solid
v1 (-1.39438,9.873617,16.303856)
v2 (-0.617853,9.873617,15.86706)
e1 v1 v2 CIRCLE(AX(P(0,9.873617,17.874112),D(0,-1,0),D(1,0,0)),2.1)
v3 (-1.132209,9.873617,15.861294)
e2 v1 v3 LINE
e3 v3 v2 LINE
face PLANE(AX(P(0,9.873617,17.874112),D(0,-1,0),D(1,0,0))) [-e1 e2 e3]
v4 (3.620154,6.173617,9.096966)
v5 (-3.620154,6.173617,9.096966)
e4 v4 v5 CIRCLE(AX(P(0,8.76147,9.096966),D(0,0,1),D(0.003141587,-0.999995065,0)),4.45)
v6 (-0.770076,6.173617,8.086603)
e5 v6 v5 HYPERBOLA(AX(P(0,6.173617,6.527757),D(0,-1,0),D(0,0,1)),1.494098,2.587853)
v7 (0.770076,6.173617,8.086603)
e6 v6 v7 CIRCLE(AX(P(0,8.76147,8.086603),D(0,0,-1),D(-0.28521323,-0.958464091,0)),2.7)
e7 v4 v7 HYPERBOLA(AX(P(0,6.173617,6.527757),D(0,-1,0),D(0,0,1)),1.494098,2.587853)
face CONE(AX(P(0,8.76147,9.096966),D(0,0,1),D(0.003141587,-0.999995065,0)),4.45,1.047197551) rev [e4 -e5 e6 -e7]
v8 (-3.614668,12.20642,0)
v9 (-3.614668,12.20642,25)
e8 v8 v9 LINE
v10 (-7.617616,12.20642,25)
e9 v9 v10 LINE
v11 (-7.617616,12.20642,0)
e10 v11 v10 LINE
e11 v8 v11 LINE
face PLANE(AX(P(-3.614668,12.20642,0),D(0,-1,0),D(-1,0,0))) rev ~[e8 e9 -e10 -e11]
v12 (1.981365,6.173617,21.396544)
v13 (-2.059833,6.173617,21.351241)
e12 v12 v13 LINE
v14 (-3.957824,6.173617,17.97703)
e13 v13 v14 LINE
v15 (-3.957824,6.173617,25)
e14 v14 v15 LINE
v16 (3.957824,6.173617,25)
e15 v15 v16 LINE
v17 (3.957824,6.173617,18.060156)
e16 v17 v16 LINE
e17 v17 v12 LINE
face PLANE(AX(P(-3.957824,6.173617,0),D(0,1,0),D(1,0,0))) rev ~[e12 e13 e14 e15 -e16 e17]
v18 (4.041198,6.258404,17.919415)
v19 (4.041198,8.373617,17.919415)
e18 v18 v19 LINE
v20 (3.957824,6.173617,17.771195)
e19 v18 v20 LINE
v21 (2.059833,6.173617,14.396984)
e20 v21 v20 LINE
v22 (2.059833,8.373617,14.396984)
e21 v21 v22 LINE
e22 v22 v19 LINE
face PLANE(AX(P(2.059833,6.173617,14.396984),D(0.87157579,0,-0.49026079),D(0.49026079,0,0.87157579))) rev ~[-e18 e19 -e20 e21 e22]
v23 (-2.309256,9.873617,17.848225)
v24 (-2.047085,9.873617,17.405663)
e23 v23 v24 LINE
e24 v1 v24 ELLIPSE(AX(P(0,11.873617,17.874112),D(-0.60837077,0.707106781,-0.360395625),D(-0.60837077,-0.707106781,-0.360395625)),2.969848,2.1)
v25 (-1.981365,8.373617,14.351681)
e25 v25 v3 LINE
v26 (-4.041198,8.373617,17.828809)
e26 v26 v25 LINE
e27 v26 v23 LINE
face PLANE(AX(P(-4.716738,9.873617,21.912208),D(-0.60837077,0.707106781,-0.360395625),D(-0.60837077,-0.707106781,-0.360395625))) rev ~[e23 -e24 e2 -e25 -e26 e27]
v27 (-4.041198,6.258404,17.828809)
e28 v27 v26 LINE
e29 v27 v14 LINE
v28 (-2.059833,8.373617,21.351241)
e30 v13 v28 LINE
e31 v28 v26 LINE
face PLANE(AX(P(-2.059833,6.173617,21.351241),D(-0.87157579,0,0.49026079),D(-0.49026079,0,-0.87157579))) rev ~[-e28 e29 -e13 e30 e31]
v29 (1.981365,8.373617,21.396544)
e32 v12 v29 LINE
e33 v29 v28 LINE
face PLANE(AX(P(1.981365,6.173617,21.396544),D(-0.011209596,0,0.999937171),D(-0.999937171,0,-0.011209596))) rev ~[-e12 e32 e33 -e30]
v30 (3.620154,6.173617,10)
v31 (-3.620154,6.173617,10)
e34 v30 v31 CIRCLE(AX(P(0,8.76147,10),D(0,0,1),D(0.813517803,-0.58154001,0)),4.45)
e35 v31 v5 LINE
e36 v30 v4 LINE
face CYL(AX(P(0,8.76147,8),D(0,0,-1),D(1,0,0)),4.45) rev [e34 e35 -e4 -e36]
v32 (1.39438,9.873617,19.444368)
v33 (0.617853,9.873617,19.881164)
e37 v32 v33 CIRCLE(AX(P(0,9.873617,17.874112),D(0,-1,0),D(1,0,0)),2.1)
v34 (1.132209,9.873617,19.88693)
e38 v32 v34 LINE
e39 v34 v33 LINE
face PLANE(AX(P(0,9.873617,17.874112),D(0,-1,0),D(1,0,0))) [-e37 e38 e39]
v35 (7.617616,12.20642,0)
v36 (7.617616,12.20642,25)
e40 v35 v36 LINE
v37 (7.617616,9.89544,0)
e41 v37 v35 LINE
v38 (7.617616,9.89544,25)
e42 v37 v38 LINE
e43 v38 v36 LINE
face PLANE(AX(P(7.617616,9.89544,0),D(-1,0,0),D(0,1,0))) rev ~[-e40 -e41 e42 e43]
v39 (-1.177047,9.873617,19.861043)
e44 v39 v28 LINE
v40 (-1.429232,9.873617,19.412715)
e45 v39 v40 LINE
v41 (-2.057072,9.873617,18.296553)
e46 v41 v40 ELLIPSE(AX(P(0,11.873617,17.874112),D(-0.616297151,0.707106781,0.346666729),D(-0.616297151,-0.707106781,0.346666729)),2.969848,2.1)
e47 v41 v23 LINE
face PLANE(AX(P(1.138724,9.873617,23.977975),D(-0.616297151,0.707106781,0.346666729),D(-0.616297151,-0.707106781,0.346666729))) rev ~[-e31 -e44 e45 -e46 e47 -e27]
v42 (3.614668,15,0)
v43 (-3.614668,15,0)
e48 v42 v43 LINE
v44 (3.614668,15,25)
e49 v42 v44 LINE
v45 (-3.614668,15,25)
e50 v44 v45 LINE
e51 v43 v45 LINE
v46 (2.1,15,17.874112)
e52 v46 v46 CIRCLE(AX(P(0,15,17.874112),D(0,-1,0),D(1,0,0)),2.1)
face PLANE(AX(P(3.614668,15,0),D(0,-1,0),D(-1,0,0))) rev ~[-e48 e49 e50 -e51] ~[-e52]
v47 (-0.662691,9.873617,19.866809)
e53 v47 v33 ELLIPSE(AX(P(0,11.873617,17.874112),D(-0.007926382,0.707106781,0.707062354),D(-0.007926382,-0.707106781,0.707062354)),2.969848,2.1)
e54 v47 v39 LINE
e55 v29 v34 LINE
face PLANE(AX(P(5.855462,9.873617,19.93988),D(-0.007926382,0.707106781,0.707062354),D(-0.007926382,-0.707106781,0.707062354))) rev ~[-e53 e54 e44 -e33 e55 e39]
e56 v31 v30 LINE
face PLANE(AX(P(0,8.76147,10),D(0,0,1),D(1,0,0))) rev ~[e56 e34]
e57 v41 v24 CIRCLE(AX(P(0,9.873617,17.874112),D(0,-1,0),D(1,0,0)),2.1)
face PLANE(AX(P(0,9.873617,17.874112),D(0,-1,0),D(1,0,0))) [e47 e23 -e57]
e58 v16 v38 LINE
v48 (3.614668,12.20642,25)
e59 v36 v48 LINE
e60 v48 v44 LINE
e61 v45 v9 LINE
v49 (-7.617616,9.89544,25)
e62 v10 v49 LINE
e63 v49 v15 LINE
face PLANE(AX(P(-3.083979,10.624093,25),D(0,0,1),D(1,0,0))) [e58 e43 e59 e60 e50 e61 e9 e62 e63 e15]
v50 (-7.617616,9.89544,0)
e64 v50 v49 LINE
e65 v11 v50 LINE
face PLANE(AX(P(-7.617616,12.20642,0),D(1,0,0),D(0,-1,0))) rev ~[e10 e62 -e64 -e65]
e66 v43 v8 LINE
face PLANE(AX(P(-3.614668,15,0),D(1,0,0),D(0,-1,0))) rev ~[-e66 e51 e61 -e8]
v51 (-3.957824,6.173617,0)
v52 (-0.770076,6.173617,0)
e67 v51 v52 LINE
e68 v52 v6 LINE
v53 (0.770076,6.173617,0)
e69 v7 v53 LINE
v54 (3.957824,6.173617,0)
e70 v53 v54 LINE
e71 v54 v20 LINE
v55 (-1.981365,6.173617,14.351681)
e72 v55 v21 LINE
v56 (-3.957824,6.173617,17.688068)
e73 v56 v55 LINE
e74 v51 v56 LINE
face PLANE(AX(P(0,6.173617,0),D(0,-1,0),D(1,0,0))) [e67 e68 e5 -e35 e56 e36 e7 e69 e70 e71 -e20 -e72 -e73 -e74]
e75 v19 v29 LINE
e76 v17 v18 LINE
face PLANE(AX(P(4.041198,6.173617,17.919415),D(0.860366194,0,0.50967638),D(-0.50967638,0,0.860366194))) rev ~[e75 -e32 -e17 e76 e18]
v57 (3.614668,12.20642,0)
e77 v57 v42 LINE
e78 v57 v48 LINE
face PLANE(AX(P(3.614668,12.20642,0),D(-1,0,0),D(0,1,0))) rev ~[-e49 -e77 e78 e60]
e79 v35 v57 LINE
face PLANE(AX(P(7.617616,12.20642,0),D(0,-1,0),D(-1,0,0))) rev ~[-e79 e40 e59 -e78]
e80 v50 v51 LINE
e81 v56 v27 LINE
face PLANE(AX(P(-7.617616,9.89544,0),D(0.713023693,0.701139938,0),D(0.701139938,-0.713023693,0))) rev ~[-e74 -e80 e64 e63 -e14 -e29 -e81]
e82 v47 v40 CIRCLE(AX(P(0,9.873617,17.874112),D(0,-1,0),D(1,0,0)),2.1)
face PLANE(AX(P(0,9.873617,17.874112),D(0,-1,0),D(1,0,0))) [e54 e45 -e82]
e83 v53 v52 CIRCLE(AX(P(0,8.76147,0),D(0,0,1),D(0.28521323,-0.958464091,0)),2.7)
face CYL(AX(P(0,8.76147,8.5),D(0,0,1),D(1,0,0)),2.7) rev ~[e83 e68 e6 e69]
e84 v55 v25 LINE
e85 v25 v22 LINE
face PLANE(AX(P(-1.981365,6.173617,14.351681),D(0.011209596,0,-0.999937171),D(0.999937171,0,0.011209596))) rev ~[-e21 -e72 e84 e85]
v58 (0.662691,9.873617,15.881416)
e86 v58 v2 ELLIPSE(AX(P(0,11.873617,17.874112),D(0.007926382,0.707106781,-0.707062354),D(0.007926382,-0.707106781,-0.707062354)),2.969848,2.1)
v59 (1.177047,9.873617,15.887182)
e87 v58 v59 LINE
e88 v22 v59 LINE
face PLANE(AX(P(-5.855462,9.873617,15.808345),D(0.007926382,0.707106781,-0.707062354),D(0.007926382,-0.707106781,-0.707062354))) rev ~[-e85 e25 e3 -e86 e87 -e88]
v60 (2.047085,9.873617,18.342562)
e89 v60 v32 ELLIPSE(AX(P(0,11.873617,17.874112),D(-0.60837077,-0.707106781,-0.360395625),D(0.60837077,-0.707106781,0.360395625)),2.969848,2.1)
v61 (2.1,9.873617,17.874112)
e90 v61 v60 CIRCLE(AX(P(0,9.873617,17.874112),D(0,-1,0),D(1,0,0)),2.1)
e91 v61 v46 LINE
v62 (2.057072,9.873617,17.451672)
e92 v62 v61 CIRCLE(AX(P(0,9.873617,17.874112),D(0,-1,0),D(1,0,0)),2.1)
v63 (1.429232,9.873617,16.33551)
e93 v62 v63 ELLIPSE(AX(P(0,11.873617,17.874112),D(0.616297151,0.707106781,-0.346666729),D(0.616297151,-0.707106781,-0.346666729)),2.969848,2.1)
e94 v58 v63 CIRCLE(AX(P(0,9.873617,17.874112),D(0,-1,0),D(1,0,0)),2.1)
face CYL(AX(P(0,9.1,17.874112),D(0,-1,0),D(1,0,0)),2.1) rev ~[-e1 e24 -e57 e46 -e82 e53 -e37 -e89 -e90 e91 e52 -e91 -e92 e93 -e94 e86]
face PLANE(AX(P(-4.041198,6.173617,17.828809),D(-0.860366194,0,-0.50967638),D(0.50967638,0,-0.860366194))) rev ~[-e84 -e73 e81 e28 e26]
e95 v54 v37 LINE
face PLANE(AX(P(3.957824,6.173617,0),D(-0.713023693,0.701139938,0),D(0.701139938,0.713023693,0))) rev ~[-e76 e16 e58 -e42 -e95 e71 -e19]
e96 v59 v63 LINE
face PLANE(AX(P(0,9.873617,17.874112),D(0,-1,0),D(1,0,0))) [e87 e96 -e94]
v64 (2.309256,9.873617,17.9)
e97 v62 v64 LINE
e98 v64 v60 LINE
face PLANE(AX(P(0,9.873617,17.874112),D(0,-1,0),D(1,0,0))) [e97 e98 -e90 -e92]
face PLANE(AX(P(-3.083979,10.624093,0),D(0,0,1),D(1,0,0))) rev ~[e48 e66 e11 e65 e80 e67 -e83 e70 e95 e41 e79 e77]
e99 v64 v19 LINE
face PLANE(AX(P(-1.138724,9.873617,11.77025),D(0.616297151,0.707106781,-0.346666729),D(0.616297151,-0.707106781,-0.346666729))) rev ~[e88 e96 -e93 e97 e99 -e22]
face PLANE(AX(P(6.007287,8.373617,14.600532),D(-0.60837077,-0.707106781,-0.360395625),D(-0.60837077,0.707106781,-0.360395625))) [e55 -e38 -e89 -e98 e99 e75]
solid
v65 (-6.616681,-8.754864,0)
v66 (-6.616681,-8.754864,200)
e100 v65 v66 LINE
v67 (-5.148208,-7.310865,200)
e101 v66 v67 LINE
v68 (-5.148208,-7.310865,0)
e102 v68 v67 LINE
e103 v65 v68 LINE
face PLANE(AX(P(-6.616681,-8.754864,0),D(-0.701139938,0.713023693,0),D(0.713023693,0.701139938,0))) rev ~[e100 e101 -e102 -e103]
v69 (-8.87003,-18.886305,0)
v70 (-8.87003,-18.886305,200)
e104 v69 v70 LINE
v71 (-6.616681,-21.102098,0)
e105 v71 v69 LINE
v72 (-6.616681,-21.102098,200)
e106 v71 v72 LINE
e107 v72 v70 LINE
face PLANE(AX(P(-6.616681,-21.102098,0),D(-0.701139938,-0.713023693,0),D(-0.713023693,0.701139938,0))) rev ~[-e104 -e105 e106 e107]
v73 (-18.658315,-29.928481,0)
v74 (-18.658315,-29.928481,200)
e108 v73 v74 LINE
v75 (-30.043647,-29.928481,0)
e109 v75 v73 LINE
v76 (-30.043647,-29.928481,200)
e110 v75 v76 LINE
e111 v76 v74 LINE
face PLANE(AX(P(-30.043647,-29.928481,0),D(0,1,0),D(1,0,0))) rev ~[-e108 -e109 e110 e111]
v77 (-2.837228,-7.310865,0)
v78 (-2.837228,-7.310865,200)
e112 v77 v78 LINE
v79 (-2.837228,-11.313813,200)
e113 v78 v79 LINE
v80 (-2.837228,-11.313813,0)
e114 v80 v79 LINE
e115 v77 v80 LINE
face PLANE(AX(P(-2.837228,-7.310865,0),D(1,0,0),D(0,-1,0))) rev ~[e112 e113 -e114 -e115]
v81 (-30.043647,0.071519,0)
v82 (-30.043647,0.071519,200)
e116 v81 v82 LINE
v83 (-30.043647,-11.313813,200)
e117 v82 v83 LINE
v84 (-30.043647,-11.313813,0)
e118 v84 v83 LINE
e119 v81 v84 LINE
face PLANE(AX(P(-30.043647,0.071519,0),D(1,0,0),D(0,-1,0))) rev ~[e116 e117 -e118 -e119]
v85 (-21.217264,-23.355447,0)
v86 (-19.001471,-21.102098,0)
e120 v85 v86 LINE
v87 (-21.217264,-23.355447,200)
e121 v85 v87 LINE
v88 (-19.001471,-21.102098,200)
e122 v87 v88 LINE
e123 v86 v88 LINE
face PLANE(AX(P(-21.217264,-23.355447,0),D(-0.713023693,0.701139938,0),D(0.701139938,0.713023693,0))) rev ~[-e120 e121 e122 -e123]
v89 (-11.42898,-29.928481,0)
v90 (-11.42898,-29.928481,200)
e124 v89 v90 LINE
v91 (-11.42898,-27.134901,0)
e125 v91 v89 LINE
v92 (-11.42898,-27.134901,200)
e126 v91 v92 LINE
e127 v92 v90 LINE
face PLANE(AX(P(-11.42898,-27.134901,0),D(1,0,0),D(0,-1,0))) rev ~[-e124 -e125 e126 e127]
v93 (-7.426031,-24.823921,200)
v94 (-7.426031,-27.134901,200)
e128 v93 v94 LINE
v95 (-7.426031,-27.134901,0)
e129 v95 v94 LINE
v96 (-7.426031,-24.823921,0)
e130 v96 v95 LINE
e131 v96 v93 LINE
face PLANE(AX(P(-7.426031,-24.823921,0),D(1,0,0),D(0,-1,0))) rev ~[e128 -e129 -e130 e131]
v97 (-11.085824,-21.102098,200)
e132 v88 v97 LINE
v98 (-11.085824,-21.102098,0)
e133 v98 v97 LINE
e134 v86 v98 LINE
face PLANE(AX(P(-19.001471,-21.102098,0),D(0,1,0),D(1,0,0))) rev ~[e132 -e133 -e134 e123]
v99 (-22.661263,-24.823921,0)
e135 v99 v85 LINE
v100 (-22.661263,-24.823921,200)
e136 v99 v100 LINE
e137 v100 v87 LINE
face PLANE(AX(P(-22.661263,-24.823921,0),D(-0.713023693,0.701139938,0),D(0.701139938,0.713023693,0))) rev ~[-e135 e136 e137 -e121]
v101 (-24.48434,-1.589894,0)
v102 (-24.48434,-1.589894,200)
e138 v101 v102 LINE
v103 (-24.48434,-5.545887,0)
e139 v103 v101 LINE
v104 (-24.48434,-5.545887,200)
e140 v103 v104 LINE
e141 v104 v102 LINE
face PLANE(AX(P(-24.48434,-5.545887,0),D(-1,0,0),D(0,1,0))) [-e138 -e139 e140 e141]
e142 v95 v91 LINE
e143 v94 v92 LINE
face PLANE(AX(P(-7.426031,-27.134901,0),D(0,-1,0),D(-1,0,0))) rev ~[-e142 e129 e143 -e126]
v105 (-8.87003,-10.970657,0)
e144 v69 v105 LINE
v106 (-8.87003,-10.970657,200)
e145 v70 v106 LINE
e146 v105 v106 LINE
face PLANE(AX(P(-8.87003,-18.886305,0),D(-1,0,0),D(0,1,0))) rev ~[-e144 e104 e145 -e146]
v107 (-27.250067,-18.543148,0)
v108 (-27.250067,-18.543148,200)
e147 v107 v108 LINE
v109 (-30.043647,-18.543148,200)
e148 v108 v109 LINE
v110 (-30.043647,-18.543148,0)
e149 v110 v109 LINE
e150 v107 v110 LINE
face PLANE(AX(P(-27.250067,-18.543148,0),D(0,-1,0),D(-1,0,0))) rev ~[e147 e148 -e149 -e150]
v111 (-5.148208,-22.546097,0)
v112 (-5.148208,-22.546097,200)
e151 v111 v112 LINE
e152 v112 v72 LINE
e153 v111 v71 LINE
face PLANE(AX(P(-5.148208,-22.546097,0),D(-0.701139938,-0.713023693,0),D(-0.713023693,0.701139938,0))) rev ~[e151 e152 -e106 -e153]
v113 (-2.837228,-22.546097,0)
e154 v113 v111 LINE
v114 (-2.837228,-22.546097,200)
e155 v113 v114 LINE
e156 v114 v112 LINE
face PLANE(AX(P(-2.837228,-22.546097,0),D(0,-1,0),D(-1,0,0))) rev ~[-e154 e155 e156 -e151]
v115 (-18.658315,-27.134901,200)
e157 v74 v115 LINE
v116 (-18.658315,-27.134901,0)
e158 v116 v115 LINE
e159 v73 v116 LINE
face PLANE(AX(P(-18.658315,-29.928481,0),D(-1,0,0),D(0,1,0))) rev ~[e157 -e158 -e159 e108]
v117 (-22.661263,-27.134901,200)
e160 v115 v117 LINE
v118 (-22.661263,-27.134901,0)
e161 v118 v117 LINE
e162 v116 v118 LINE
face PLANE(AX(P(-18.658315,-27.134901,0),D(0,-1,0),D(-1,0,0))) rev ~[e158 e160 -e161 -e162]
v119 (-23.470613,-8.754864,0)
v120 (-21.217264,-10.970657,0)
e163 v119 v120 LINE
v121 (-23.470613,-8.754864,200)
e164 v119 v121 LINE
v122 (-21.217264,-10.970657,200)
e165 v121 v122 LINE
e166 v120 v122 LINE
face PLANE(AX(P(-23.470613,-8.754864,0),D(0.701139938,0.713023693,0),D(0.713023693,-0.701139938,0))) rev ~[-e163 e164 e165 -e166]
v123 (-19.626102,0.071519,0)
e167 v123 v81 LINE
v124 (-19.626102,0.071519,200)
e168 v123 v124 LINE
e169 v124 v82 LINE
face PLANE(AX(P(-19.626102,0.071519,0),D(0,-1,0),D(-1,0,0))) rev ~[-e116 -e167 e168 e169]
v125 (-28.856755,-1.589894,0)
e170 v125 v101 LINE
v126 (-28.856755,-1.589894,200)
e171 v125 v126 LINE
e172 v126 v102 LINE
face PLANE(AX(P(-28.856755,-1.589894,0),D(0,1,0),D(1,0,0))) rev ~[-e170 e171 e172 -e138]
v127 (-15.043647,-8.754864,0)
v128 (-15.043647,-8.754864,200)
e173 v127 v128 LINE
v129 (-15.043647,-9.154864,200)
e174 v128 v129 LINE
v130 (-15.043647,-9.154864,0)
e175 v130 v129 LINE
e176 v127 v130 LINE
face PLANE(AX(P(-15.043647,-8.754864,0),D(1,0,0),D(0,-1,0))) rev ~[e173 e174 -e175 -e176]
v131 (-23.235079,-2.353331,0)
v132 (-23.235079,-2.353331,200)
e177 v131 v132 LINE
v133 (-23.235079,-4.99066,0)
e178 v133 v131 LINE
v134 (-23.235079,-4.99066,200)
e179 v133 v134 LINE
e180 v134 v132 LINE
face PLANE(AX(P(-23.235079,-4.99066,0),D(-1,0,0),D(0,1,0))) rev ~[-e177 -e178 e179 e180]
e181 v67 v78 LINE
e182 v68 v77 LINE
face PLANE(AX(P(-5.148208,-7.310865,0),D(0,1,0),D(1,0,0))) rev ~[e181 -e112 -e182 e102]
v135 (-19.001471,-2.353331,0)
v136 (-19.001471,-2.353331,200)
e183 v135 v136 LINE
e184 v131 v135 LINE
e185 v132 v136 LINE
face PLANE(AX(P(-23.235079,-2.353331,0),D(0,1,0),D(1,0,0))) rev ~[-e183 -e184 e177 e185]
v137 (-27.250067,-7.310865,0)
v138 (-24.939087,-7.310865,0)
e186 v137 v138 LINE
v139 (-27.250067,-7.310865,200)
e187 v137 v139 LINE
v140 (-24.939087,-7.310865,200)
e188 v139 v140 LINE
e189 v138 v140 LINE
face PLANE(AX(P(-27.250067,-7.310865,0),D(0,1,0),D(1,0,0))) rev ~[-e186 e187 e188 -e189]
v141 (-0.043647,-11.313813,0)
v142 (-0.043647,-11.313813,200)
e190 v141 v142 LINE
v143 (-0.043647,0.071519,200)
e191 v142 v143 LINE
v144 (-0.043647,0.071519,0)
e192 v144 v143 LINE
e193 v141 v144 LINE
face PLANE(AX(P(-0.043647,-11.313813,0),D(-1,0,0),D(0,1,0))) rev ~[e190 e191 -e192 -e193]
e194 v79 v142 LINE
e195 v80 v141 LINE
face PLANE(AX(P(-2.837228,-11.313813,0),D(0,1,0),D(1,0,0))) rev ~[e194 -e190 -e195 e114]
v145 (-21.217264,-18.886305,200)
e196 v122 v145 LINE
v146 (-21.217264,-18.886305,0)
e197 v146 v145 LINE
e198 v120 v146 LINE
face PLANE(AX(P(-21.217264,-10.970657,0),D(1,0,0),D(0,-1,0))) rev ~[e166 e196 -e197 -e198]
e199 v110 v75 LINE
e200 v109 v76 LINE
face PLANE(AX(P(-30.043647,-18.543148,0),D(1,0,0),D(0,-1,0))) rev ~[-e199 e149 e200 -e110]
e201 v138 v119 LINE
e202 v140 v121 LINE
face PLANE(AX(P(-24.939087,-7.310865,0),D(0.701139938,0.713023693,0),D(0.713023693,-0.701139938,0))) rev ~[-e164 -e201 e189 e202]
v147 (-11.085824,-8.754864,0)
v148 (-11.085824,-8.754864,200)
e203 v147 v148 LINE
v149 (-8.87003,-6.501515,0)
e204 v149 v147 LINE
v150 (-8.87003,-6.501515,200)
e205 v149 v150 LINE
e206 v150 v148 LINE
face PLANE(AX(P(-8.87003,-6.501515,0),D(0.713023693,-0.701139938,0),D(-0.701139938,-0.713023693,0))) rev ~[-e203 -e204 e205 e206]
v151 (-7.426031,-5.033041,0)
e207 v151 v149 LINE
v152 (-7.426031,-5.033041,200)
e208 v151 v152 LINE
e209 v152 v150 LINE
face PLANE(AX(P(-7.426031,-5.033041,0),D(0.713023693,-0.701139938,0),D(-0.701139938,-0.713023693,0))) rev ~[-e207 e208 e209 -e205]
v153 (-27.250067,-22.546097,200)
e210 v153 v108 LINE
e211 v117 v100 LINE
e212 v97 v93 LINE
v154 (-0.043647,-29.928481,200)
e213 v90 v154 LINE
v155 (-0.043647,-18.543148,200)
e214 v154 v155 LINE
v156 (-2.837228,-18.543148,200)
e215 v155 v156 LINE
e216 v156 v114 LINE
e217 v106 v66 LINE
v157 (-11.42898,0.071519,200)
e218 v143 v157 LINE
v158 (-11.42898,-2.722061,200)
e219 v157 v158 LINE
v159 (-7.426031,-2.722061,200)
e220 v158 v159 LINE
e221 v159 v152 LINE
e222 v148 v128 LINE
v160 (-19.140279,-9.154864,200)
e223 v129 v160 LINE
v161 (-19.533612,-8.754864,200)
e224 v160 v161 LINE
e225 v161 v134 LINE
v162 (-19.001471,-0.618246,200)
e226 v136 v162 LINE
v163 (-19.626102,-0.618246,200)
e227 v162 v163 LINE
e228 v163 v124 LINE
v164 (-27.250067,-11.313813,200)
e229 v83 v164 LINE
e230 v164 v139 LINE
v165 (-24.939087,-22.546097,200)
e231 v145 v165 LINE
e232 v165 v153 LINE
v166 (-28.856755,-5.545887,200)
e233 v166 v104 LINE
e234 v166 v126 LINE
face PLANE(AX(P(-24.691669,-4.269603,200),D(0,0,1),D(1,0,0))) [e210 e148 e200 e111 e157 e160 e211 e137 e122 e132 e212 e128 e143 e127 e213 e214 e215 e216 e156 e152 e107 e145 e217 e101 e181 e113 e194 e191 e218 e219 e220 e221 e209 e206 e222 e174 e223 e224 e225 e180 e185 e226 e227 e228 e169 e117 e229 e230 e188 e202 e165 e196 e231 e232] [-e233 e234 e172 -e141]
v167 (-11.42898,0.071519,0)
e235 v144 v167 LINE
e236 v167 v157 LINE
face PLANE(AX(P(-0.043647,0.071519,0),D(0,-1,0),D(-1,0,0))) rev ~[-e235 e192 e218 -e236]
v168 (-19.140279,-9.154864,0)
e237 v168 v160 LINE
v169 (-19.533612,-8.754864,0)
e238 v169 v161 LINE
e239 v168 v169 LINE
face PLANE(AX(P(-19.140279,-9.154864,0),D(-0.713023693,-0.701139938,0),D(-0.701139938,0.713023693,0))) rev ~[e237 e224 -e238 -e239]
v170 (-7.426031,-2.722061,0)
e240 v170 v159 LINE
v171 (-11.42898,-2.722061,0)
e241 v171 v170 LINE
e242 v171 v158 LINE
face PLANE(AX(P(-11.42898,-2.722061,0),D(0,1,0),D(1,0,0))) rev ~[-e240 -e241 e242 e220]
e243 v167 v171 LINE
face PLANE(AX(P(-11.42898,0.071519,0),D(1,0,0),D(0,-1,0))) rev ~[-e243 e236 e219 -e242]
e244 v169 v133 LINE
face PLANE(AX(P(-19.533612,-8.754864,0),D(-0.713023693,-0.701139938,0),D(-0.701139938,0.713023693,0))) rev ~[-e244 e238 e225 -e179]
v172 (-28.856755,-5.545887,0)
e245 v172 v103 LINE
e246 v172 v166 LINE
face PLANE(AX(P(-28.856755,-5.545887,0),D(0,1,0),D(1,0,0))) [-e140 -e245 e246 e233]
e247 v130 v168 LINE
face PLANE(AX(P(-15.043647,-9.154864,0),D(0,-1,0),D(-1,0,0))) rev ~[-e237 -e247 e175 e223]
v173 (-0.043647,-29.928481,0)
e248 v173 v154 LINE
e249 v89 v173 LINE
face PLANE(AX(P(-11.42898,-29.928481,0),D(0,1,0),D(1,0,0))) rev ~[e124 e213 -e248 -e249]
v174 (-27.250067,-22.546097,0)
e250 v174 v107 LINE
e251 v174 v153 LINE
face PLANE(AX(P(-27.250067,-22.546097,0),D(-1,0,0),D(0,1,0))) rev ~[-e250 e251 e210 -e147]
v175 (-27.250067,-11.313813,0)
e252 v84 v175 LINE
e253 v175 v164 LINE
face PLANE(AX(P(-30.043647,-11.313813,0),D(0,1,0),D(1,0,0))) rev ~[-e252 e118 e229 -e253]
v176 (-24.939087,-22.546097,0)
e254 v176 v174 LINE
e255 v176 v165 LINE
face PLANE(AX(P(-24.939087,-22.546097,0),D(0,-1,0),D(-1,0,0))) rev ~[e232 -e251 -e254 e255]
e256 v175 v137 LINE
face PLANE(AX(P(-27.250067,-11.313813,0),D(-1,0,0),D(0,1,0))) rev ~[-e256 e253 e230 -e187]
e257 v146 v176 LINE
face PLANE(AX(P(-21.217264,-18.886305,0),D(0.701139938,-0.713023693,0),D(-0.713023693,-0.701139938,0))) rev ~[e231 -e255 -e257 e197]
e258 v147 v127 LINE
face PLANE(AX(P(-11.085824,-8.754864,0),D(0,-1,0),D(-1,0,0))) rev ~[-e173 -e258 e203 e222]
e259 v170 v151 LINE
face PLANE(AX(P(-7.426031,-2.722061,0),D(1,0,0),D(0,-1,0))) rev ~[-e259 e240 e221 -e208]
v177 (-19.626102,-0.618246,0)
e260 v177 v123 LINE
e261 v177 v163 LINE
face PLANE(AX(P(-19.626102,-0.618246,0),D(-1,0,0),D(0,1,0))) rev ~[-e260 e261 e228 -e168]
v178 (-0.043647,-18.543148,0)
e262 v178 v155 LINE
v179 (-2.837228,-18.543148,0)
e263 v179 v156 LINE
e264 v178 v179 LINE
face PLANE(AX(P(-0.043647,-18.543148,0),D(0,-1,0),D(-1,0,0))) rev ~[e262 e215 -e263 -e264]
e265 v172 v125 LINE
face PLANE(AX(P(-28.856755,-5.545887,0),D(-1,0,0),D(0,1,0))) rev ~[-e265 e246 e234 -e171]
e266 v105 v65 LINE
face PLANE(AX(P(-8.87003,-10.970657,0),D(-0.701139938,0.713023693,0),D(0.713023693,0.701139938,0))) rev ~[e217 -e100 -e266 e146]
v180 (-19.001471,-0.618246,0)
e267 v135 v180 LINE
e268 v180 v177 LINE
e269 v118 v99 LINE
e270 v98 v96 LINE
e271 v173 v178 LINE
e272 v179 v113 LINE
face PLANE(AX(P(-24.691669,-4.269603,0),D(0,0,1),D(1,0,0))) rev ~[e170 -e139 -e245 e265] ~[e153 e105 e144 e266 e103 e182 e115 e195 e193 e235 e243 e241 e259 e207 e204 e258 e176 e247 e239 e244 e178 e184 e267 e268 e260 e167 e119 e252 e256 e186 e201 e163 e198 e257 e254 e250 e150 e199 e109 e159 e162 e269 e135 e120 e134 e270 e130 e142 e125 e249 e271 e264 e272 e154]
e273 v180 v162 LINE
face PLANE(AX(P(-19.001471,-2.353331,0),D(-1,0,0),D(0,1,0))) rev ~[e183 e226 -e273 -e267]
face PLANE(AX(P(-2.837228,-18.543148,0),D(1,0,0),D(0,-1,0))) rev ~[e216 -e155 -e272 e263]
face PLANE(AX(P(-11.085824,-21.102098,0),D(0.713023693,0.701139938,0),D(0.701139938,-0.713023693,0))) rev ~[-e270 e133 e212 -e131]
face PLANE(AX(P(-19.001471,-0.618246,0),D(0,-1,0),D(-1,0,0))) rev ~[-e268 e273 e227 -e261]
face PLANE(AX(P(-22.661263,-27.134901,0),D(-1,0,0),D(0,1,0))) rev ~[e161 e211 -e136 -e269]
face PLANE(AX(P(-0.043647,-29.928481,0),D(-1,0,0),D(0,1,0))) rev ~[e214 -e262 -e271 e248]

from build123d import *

# Parameters (mm, degrees)
F1_DEPTH     = 25
F2_R         = 2.7
F3_DEPTH     = 10
F4_R         = 2.1
F5_DEPTH     = 3.7
F6_DEPTH     = 25
F7_START     = 8
F2_R_2       = 4.45
F7_DEPTH     = 2
F8_T4_ANGLE  = 359.64
F8_S6_R      = 2.7
F8_T7_DEPTH  = 8
F9_T4_DEPTH  = 11.7565008482
F9_S5_R      = 2.1
F9_T6_DEPTH  = 8
F9_T10_DEPTH = 11.7565008482
F9_S11_R     = 2.1
F9_T12_DEPTH = 8
F9_T16_DEPTH = 11.7565008482
F9_S17_R     = 2.1
F9_T18_DEPTH = 7
F9_T22_DEPTH = 11.7565008482
F9_S23_R     = 2.1
F9_T24_DEPTH = 8
F9_T28_DEPTH = 11.7565008482
F9_S29_R     = 2.1
F9_T30_DEPTH = 7
F9_T34_DEPTH = 11.7565008482
F9_S35_R     = 2.1
F9_T36_DEPTH = 8
F10_W        = 4.3724142015
F10_H        = 3.9559938014
F11_DEPTH    = 200


# Not quite as in the source:
# - a fillet or chamfer that OpenCascade refuses, or shapes differently, is made with other operations: its cross-section is extruded or revolved along the edge and cut away or added


with BuildPart() as f1:
    # F0 (on Top) → F1 (new body)
    with BuildSketch(Plane.XY):
        Polygon((0, 15), (-3.6146675702, 15), (-3.6146675702, 12.2064198286), (-7.6176160946, 12.2064198286), (-7.6176160946, 9.8954397172), (-3.9578238502, 6.1736169547), (0, 6.1736169547), align=None)
        Polygon((3.6146675702, 12.2064198286), (3.6146675702, 15), (0, 15), (0, 6.1736169547), (3.9578238502, 6.1736169547), (7.6176160946, 9.8954397172), (7.6176160946, 12.2064198286), align=None)
    extrude(amount=F1_DEPTH)

    # F2 (on Top) → F3 (cut)
    with BuildSketch(Plane.XY):
        with Locations((0, 8.76147)):
            Circle(F2_R)
    extrude(amount=F3_DEPTH, mode=Mode.SUBTRACT)

    # F4 (on face) → F5 (cut)
    with BuildSketch(Plane.XZ.offset(-6.1736169547)):
        Polygon((2.059832568, 14.396983778), (4.0411979619, 17.9194153968), (1.9813653939, 21.3965439715), (-2.059832568, 21.3512409274), (-4.0411979619, 17.8288093087), (-1.9813653939, 14.3516807339), align=None)
        with Locations((0, 17.8741123527)):
            Circle(F4_R, mode=Mode.SUBTRACT)
    extrude(amount=-F5_DEPTH, mode=Mode.SUBTRACT)

    # F4 (on face) → F6 (cut)
    with BuildSketch(Plane.XZ.offset(-6.1736169547)):
        with Locations((0, 17.8741123527)):
            Circle(F4_R)
    extrude(amount=-F6_DEPTH, mode=Mode.SUBTRACT)

    # F2 (on Top) → F7 (cut)
    with BuildSketch(Plane.XY.offset(F7_START)):
        with Locations((0, 8.76147)):
            Circle(F2_R_2)
        with Locations((0, 8.76147)):
            Circle(F2_R, mode=Mode.SUBTRACT)
        with Locations((0, 8.76147)):
            Circle(F2_R)
    extrude(amount=F7_DEPTH, mode=Mode.SUBTRACT)

    # F8: chamfer of 1.9 x 1.0969655115 on 1 edges, made by hand


with BuildPart() as f8_tool2:
    # F8_s3 → F8_t4 (revolve)
    with BuildSketch(Plane(origin=(0.0275247887, 8.6472e-05, 0), x_dir=(0, 0, 1), z_dir=(-0.9999950652, -0.0031415875, 0))):
        Polygon((9.0969655115, 4.3114267639), (8, 6.2114267639), (8, 4.3114267639), align=None)
    revolve(axis=Axis((0, 8.76147, 8), (0, 0, 1)), revolution_arc=F8_T4_ANGLE)

    split(bisect_by=Plane.XZ.offset(-6.1736169547), keep=Keep.BOTTOM)

    # F8_s6 → F8_t7 (cut, symmetric)
    with BuildSketch(Plane.XY.offset(8.5)):
        with Locations((0, 8.76147)):
            Circle(F8_S6_R)
    extrude(amount=F8_T7_DEPTH, both=True, mode=Mode.SUBTRACT)


with BuildPart() as f1_1:
    add(f1.part)

    # F8_t1: union F8_tool2
    add(f8_tool2.part)

    # F9: chamfer of 1.5 on 6 edges, made by hand


with BuildPart() as f9_tool2:
    # F9_s3 → F9_t4 (new body)
    with BuildSketch(Plane(origin=(-4.8419417128, 0, 8.173506016), x_dir=(0, 1, 0), z_dir=(-0.5096763804, 0, 0.8603661937))):
        Polygon((8.3736169547, -12.610012887), (9.8736169547, -11.110012887), (9.8736169547, -12.610012887), align=None)
    extrude(amount=F9_T4_DEPTH)

    # F9_s5 → F9_t6 (cut, symmetric)
    with BuildSketch(Plane.XZ.offset(-9.1)):
        with Locations((0, 17.8741123527)):
            Circle(F9_S5_R)
    extrude(amount=F9_T6_DEPTH, both=True, mode=Mode.SUBTRACT)


with BuildPart() as f1_2:
    add(f1_1.part)

    # F9_t1: union F9_tool2
    add(f9_tool2.part)


with BuildPart() as f9_tool8:
    # F9_s9 → F9_t10 (new body)
    with BuildSketch(Plane(origin=(4.7557224198, 0, 8.4546278405), x_dir=(0, 1, 0), z_dir=(0.4902607901, 0, 0.87157579))):
        Polygon((9.8736169547, 6.7629764442), (8.3736169547, 5.2629764442), (9.8736169547, 5.2629764442), align=None)
    extrude(amount=F9_T10_DEPTH)

    # F9_s11 → F9_t12 (cut, symmetric)
    with BuildSketch(Plane.XZ.offset(-9.1)):
        with Locations((0, 17.8741123527)):
            Circle(F9_S11_R)
    extrude(amount=F9_T12_DEPTH, both=True, mode=Mode.SUBTRACT)


with BuildPart() as f1_3:
    add(f1_2.part)

    # F9_t7: union F9_tool8
    add(f9_tool8.part)


with BuildPart() as f9_tool14:
    # F9_s15 → F9_t16 (new body)
    with BuildSketch(Plane(origin=(-5.6775321016, 0, -0.0636468417), x_dir=(0, 1, 0), z_dir=(0.9999371705, 0, 0.0112095963))):
        Polygon((9.8736169547, 15.8729893312), (8.3736169547, 14.3729893312), (9.8736169547, 14.3729893312), align=None)
    extrude(amount=F9_T16_DEPTH)

    # F9_s17 → F9_t18 (cut, symmetric)
    with BuildSketch(Plane.XZ.offset(-9.1)):
        with Locations((0, 17.8741123527)):
            Circle(F9_S17_R)
    extrude(amount=F9_T18_DEPTH, both=True, mode=Mode.SUBTRACT)


with BuildPart() as f1_4:
    add(f1_3.part)

    # F9_t13: union F9_tool14
    add(f9_tool14.part)


with BuildPart() as f9_tool20:
    # F9_s21 → F9_t22 (new body)
    with BuildSketch(Plane(origin=(-10.8339525114, 0, 18.288401902), x_dir=(0, 1, 0), z_dir=(0.5096763804, 0, -0.8603661937))):
        Polygon((9.8736169547, 7.110012887), (8.3736169547, 5.610012887), (9.8736169547, 5.610012887), align=None)
    extrude(amount=F9_T22_DEPTH)

    # F9_s23 → F9_t24 (cut, symmetric)
    with BuildSketch(Plane.XZ.offset(-9.1)):
        with Locations((0, 17.8741123527)):
            Circle(F9_S23_R)
    extrude(amount=F9_T24_DEPTH, both=True, mode=Mode.SUBTRACT)


with BuildPart() as f1_5:
    add(f1_4.part)

    # F9_t19: union F9_tool20
    add(f9_tool20.part)


with BuildPart() as f9_tool26:
    # F9_s27 → F9_t28 (new body)
    with BuildSketch(Plane(origin=(6.0782300916, 0, 0.0681387867), x_dir=(0, 1, 0), z_dir=(-0.9999371705, 0, -0.0112095963))):
        Polygon((9.8736169547, -19.8729893312), (8.3736169547, -21.3729893312), (9.8736169547, -21.3729893312), align=None)
    extrude(amount=F9_T28_DEPTH)

    # F9_s29 → F9_t30 (cut, symmetric)
    with BuildSketch(Plane.XZ.offset(-9.1)):
        with Locations((0, 17.8741123527)):
            Circle(F9_S29_R)
    extrude(amount=F9_T30_DEPTH, both=True, mode=Mode.SUBTRACT)


with BuildPart() as f1_6:
    add(f1_5.part)

    # F9_t25: union F9_tool26
    add(f9_tool26.part)


with BuildPart() as f9_tool32:
    # F9_s33 → F9_t34 (new body)
    with BuildSketch(Plane(origin=(10.5194738143, 0, 18.7013093548), x_dir=(0, 1, 0), z_dir=(-0.4902607901, 0, -0.87157579))):
        Polygon((9.8736169547, -10.7629764442), (8.3736169547, -12.2629764442), (9.8736169547, -12.2629764442), align=None)
    extrude(amount=F9_T34_DEPTH)

    # F9_s35 → F9_t36 (cut, symmetric)
    with BuildSketch(Plane.XZ.offset(-9.1)):
        with Locations((0, 17.8741123527)):
            Circle(F9_S35_R)
    extrude(amount=F9_T36_DEPTH, both=True, mode=Mode.SUBTRACT)


with BuildPart() as f1_7:
    add(f1_6.part)

    # F9_t31: union F9_tool32
    add(f9_tool32.part)


with BuildPart() as f11:
    # F10 (on Top) → F11 (new body)
    with BuildSketch(Plane.XY):
        Polygon((-24.939087107, -7.310864791), (-23.4706133497, -8.754863931), (-19.5336121346, -8.754863931), (-23.2350792623, -4.9906599296), (-23.2350792623, -2.3533313495), (-19.00147124, -2.3533313495), (-19.00147124, -0.6182457281), (-19.6261023059, -0.6182457281), (-19.6261023059, 0.0715191143), (-30.0436473898, 0.0715191143), (-30.0436473898, -8.754863931), (-27.2500672184, -8.754863931), (-27.2500672184, -7.310864791), align=None)
        with Locations((-26.6705475635, -3.5678905395)):
            Rectangle(F10_W, F10_H, mode=Mode.SUBTRACT)
        Polygon((-11.0858235396, -21.1020978404), (-6.6166814299, -21.1020978404), (-8.8700304351, -18.8863047359), (-8.8700304351, -10.9706570355), (-8.8700304351, -8.754863931), (-11.0858235396, -8.754863931), (-15.0436473898, -8.754863931), (-15.0436473898, -9.154863931), (-19.1402788162, -9.154863931), (-19.5336121346, -8.754863931), (-23.4706133497, -8.754863931), (-21.2172643445, -10.9706570355), (-21.2172643445, -18.8863047359), (-21.2172643445, -23.3554468456), (-19.00147124, -21.1020978404), align=None)
        Polygon((-27.2500672184, -11.3138133155), (-27.2500672184, -8.754863931), (-30.0436473898, -8.754863931), (-30.0436473898, -10.3460259696), (-30.0436473898, -11.3138133155), align=None)
        Polygon((-8.8700304351, -8.754863931), (-6.6166814299, -8.754863931), (-5.1482076726, -7.310864791), (-2.8372275612, -7.310864791), (-2.8372275612, -8.754863931), (-0.0436473898, -8.754863931), (-0.0436473898, 0.0715191143), (-8.8700304351, 0.0715191143), (-8.8700304351, -2.7220610571), (-7.4260312951, -2.7220610571), (-7.4260312951, -5.0330411685), (-8.8700304351, -6.5015149258), align=None)
        Polygon((-2.8372275612, -11.3138133155), (-0.0436473898, -11.3138133155), (-0.0436473898, -10.3460259696), (-0.0436473898, -8.754863931), (-2.8372275612, -8.754863931), align=None)
        Polygon((-2.8372275612, -21.1020978404), (-0.0436473898, -21.1020978404), (-0.0436473898, -19.5109358018), (-0.0436473898, -18.5431484559), (-2.8372275612, -18.5431484559), align=None)
        Polygon((-10.4611924737, -29.9284808857), (-0.0436473898, -29.9284808857), (-0.0436473898, -21.1020978404), (-2.8372275612, -21.1020978404), (-2.8372275612, -22.5460969803), (-5.1482076726, -22.5460969803), (-6.6166814299, -21.1020978404), (-11.0858235396, -21.1020978404), (-7.4260312951, -24.8239206029), (-7.4260312951, -27.1349007143), (-11.4289798196, -27.1349007143), (-11.4289798196, -29.9284808857), align=None)
        Polygon((-30.0436473898, -29.9284808857), (-21.2172643445, -29.9284808857), (-21.2172643445, -27.1349007143), (-22.6612634844, -27.1349007143), (-22.6612634844, -24.8239206029), (-21.2172643445, -23.3554468456), (-21.2172643445, -18.8863047359), (-24.939087107, -22.5460969803), (-27.2500672184, -22.5460969803), (-27.2500672184, -18.5431484559), (-30.0436473898, -18.5431484559), (-30.0436473898, -19.5109358018), align=None)
        Polygon((-19.6261023059, -29.9284808857), (-18.65831496, -29.9284808857), (-18.65831496, -27.1349007143), (-21.2172643445, -27.1349007143), (-21.2172643445, -29.9284808857), align=None)
        Polygon((-11.4289798196, -2.7220610571), (-8.8700304351, -2.7220610571), (-8.8700304351, 0.0715191143), (-10.4611924737, 0.0715191143), (-11.4289798196, 0.0715191143), align=None)
        Polygon((-11.0858235396, -8.754863931), (-8.8700304351, -8.754863931), (-8.8700304351, -6.5015149258), align=None)
        Polygon((-8.8700304351, -8.754863931), (-8.8700304351, -10.9706570355), (-6.6166814299, -8.754863931), align=None)
    extrude(amount=F11_DEPTH)


solid = Compound([f1_7.part, f11.part])
